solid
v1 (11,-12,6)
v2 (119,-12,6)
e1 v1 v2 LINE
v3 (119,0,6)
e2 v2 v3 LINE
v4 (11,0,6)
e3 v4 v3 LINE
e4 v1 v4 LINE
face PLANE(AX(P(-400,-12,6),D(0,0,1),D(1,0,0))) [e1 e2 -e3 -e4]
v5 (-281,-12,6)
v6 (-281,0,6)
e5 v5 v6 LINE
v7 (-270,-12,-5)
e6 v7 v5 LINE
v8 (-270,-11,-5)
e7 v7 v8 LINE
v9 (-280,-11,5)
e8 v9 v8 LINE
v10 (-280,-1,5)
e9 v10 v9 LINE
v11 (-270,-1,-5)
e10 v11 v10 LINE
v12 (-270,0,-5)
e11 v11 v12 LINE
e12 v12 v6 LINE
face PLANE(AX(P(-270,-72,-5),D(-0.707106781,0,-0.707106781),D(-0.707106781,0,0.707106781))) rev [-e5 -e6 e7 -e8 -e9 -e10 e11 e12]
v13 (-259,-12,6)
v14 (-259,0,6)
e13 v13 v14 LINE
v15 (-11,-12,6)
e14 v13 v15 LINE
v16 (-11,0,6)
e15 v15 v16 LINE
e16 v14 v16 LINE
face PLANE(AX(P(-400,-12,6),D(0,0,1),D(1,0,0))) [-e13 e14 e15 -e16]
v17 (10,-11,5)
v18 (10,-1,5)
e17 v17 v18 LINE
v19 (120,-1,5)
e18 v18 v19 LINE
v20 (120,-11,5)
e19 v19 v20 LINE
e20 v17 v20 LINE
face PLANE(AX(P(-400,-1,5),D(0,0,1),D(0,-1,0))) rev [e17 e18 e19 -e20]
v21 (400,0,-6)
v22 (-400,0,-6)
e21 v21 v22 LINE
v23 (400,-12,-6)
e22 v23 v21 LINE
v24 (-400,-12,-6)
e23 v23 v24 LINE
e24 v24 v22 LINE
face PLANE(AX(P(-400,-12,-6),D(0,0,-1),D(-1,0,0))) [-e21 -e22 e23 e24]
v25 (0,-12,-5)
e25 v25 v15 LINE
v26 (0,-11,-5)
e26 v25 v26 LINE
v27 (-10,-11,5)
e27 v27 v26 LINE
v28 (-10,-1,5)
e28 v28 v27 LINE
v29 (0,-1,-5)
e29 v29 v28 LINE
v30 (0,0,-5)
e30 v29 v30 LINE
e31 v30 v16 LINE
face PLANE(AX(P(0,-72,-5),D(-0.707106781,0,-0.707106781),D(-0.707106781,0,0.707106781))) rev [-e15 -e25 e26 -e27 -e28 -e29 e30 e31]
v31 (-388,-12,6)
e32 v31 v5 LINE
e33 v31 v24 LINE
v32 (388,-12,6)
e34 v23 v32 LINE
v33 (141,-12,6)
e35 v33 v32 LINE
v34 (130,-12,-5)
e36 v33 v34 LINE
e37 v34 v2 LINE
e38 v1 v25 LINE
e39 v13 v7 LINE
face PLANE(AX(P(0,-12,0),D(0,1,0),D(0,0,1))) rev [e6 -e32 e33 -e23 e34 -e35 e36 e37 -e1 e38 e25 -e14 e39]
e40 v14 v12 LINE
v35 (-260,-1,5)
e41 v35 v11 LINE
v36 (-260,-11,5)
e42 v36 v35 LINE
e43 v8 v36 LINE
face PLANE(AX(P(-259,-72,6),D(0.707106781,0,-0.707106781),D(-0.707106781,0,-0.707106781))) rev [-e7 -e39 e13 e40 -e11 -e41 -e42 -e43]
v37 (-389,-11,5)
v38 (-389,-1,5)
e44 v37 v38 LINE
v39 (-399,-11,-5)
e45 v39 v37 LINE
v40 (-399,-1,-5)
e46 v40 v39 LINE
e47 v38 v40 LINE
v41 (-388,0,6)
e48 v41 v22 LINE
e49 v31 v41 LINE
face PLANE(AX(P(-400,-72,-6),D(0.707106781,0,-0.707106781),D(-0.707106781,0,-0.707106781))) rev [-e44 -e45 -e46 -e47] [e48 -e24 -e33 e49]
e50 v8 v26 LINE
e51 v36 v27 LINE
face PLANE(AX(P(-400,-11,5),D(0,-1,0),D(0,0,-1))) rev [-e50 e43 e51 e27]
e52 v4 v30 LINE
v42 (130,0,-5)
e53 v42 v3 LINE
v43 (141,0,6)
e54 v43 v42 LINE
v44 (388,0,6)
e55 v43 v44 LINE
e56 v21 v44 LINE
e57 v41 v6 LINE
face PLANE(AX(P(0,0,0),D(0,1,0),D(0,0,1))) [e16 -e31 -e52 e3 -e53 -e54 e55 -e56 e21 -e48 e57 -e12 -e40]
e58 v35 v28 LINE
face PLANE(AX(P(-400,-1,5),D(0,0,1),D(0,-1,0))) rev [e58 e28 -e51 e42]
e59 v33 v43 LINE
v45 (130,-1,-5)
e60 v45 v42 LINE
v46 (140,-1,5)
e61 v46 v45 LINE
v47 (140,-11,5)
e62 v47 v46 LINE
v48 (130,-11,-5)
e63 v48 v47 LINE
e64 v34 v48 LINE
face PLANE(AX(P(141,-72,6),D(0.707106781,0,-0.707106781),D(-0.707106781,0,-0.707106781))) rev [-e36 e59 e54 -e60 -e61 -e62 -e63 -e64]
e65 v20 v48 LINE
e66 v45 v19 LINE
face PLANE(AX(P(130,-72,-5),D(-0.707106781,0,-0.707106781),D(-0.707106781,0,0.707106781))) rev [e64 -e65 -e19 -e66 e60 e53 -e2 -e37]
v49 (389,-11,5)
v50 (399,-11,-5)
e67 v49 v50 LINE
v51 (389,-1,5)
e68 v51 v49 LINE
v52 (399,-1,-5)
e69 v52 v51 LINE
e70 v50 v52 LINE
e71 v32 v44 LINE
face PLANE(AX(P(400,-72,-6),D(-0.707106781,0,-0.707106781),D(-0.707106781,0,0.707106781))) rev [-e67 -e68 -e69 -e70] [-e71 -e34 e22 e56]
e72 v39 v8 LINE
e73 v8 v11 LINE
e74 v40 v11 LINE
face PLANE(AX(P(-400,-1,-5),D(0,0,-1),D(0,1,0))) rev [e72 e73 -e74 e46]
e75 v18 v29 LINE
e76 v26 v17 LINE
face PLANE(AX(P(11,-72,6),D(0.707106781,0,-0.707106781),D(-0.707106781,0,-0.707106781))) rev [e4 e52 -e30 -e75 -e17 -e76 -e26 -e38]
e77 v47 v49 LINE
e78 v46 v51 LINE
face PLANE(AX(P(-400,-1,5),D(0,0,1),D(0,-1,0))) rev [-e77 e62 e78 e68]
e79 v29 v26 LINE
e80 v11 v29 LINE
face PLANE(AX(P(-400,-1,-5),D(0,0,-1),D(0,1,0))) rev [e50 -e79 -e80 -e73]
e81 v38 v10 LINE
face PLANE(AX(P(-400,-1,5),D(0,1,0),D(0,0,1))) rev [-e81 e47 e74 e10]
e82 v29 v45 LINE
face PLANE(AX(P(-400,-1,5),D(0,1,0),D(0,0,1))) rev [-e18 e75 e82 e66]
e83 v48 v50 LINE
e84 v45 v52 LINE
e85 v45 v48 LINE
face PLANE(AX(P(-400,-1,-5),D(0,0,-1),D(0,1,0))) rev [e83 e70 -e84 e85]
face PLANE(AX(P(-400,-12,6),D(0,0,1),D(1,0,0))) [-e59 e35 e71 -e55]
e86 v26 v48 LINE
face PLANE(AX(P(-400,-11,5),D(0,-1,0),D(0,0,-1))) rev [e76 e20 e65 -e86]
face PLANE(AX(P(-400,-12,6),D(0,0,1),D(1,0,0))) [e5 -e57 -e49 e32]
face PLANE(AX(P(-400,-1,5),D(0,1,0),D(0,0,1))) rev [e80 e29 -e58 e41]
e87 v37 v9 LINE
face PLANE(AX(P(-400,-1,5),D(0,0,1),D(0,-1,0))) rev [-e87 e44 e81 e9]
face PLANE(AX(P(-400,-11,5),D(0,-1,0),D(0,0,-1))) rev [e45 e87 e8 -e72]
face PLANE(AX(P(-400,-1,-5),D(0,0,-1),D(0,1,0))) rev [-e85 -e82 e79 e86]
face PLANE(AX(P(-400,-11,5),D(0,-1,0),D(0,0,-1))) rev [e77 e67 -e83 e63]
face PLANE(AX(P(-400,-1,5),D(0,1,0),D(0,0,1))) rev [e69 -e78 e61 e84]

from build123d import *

# Parameters (mm, degrees)
SKETCH4_W          = 800
SKETCH4_H          = 12
BASE_FLANGE1_DEPTH = 12
SKETCH9_W          = 10
SKETCH9_H          = 10
CUT_EXTRUDE2_DEPTH = 801.112492091
CUT_EXTRUDE3_DEPTH = 72


# Sheet-metal steps are written as plain solids
with BuildPart() as part:
    # Sketch4 → Base-Flange1 (new body)
    with BuildSketch(Plane(origin=(0, 0, 0), x_dir=(1, 0, 0), z_dir=(0, 1, 0))):
        Rectangle(SKETCH4_W, SKETCH4_H)
    extrude(amount=-BASE_FLANGE1_DEPTH)

    # Sketch9 → Cut-Extrude2 (cut, through all)
    with BuildSketch(Plane(origin=(400, 0, 0), x_dir=(0, 0, -1), z_dir=(1, 0, 0))):
        with Locations((0, -6)):
            Rectangle(SKETCH9_W, SKETCH9_H)
    extrude(amount=-CUT_EXTRUDE2_DEPTH, mode=Mode.SUBTRACT)

    # Sketch12 → Cut-Extrude3 (cut)
    with BuildSketch(Plane(origin=(0, 0, 0), x_dir=(1, 0, 0), z_dir=(0, 1, 0))):
        Polygon((-270, 5), (-281, -6), (-259, -6), align=None)
        Polygon((11, -6), (0, 5), (-11, -6), align=None)
        Polygon((141, -6), (130, 5), (119, -6), align=None)
        Polygon((-400, 6), (-388, -6), (-400, -6), align=None)
        Polygon((400, -6), (400, 6), (388, -6), align=None)
    extrude(amount=-CUT_EXTRUDE3_DEPTH, mode=Mode.SUBTRACT)


solid = part.part
